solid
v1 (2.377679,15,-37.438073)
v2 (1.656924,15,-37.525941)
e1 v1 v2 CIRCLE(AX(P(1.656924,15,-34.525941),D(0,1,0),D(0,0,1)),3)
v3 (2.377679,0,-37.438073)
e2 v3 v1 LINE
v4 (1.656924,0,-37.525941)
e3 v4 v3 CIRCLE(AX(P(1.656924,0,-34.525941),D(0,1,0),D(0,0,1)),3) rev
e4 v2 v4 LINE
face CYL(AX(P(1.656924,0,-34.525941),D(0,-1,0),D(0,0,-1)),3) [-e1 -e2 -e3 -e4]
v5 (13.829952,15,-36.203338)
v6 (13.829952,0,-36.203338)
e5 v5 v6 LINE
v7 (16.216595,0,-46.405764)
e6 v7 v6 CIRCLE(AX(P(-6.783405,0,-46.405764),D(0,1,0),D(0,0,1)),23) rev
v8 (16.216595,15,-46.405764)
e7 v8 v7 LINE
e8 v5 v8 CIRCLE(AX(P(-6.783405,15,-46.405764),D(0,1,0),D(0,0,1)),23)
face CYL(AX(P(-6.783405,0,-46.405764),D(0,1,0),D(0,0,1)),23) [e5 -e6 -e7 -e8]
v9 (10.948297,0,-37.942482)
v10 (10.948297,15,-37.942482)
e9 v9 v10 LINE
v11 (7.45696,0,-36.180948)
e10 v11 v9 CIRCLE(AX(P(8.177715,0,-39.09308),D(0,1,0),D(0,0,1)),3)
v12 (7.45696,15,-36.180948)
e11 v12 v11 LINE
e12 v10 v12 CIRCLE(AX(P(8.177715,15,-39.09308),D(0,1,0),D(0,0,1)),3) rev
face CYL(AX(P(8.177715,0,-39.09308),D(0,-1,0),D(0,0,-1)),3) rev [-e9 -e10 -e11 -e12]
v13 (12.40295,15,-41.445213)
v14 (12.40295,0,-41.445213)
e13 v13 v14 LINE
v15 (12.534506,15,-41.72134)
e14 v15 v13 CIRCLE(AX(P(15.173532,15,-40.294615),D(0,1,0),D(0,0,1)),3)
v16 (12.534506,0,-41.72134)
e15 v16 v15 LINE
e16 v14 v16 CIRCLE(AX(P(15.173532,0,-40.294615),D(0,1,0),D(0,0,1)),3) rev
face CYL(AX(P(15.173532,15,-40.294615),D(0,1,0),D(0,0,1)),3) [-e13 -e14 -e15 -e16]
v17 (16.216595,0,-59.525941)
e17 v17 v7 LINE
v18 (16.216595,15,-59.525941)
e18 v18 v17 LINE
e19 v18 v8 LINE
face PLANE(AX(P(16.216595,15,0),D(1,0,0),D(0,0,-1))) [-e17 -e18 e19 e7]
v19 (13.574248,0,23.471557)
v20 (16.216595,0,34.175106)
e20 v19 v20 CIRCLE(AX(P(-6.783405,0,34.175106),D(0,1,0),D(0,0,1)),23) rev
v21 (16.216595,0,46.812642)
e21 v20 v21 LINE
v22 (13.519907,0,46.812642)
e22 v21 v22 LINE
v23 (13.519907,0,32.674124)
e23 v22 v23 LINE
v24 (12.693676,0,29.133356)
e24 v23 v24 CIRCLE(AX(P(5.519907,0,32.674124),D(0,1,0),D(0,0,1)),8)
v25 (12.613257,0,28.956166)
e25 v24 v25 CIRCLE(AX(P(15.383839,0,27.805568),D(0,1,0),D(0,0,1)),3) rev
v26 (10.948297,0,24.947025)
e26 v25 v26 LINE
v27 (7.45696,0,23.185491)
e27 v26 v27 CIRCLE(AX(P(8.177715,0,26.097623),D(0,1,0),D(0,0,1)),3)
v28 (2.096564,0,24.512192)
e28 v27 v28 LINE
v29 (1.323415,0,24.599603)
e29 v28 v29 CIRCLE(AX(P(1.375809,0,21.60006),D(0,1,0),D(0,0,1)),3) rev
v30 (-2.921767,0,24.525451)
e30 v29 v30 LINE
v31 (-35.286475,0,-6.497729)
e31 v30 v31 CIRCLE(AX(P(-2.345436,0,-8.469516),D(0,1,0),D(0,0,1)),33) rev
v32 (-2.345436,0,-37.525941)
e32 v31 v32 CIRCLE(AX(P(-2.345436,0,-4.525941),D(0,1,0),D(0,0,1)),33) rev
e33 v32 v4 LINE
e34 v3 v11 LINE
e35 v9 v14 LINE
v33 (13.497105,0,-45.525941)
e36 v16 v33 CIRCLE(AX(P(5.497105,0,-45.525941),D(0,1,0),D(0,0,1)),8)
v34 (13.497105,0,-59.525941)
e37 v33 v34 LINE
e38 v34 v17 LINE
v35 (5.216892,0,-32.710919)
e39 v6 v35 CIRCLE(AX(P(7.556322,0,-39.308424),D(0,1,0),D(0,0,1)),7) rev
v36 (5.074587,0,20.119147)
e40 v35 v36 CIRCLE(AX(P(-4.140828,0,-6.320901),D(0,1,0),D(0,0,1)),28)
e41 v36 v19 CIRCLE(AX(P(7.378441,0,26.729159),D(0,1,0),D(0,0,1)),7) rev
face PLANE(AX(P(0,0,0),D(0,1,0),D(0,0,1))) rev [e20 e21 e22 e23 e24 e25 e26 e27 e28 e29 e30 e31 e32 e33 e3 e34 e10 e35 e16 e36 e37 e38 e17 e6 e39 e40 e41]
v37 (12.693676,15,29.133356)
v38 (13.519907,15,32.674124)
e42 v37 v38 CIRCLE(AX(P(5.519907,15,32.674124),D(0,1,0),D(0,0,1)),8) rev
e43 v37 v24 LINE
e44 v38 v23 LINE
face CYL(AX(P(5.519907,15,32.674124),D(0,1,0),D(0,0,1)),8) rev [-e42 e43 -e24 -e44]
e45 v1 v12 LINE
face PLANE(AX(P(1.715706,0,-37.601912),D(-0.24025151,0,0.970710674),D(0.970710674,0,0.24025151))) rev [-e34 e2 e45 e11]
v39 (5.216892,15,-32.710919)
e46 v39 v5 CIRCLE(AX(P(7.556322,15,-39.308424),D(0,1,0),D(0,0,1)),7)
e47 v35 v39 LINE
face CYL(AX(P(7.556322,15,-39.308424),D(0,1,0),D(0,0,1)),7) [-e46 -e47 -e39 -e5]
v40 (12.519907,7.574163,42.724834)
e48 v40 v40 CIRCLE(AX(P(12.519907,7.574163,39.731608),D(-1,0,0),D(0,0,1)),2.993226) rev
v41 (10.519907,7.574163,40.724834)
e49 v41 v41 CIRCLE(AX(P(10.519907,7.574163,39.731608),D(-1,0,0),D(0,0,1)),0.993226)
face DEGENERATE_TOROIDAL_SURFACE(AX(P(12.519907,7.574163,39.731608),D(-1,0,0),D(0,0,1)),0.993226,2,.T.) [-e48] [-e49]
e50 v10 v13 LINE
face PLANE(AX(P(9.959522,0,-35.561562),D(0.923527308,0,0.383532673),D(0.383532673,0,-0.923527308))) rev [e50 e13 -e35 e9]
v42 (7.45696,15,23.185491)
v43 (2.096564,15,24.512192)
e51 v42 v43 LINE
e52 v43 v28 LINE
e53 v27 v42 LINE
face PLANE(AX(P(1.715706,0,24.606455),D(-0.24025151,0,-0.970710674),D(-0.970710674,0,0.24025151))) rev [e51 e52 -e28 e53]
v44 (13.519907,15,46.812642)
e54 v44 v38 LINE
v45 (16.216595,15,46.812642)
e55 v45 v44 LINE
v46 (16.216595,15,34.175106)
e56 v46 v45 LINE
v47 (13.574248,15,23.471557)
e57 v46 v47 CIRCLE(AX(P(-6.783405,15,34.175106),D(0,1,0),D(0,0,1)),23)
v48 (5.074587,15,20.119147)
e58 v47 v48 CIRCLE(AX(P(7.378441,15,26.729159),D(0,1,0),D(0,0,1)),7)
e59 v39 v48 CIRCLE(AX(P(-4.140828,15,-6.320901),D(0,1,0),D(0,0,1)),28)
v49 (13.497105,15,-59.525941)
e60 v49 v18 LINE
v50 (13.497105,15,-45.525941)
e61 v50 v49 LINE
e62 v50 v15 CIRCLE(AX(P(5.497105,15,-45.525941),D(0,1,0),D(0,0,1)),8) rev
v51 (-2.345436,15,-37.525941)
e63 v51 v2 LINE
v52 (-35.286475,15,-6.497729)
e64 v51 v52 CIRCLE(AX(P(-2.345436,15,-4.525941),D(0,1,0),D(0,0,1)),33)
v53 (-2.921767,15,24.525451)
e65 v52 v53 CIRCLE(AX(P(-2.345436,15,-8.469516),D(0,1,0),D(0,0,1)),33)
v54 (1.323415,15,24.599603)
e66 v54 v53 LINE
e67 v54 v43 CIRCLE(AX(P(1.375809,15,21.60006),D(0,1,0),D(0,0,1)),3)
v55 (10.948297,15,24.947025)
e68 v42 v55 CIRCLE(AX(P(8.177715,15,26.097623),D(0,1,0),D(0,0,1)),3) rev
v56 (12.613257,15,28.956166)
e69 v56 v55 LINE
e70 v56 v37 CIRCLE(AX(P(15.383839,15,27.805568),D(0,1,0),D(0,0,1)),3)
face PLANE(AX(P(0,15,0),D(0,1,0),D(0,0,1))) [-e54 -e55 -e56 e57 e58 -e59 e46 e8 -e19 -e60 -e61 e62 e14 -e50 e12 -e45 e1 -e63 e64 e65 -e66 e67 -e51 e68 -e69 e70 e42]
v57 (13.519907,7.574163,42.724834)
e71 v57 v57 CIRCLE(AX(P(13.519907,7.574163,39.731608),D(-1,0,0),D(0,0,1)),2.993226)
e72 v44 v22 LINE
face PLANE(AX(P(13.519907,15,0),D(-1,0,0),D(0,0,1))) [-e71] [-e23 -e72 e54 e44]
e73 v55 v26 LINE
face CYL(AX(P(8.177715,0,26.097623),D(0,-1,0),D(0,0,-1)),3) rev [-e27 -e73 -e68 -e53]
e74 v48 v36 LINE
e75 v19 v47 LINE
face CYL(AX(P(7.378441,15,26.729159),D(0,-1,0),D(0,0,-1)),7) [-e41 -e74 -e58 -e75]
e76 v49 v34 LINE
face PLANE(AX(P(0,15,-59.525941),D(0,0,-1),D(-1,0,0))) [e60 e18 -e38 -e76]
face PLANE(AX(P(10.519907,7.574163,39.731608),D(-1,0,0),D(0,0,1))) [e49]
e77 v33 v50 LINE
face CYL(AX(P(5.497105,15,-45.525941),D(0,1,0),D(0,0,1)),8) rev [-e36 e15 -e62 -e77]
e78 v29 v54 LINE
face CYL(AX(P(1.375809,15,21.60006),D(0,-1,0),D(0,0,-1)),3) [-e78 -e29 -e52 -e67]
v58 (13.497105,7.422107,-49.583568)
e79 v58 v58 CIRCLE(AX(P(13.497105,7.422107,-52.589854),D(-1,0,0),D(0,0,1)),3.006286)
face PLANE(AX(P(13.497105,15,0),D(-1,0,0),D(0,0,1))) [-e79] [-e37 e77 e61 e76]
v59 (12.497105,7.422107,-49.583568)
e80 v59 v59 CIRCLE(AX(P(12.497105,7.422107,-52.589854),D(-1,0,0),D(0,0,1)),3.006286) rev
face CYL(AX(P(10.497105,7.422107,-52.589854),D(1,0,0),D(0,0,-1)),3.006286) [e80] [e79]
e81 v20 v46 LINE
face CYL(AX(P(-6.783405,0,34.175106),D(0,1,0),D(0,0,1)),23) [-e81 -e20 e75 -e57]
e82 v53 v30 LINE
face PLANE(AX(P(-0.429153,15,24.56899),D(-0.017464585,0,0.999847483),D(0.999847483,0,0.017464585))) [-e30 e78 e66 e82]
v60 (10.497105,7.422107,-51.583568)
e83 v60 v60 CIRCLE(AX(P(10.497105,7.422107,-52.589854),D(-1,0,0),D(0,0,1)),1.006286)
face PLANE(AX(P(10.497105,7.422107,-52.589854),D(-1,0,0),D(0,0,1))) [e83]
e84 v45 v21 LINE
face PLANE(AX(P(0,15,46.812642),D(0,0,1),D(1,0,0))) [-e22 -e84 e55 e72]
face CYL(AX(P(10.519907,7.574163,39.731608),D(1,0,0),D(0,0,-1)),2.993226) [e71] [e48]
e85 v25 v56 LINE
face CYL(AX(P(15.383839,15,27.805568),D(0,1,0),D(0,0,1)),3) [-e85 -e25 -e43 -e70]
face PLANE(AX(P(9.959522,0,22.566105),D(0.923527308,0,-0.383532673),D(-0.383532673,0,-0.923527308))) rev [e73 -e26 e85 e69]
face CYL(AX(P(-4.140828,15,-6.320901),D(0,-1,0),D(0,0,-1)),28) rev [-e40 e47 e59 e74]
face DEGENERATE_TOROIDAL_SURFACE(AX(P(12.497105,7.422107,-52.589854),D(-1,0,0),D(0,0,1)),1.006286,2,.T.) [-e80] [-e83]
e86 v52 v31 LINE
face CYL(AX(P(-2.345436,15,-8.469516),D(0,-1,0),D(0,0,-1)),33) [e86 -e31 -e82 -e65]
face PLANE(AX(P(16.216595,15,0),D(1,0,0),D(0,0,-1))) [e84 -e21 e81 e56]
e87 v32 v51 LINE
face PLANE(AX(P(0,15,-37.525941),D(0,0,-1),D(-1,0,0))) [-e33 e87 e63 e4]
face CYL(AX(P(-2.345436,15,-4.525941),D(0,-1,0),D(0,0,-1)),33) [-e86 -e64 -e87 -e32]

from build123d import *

# Parameters (mm, degrees)
BOSS_EXTRUDE1_DEPTH = 15
FILLET1_R           = 33
FILLET3_R           = 8
SKETCH3_W           = 14.976754218
SKETCH3_H           = 50.502927364
CUT_EXTRUDE1_DEPTH  = 71.805882398
FILLET4_R           = 13
FILLET5_R           = 23
CUT_EXTRUDE2_DEPTH  = 71.805882398
FILLET6_R           = 3
FILLET7_R           = 7
SKETCH11_R          = 2.99322587
BOSS_EXTRUDE3_DEPTH = 3
SKETCH12_R          = 3.00628595
BOSS_EXTRUDE4_DEPTH = 3
FILLET15_R          = 2


with BuildPart() as part:
    # Sketch1 → Boss-Extrude1 (new body)
    with BuildSketch(Plane(origin=(0, 0, 0), x_dir=(1, 0, 0), z_dir=(0, 1, 0))):
        with BuildLine():
            Line((13.49710544, 37.52594122), (-35.345435735, 37.52594122))
            Line((-35.345435735, 37.52594122), (-35.345435735, -23.95909877))
            Line((-35.345435735, -23.95909877), (13.519906977, -24.812641875))
            Line((13.519906977, -24.812641875), (13.519906977, -46.812641875))
            Line((13.519906977, -46.812641875), (16.216594819, -46.812641875))
            Line((16.216594819, -46.812641875), (16.216594819, -12.903441484))
            ThreePointArc((16.216594819, -12.903441484), (-32.140827884, 6.320900922), (16.216594819, 25.545243327))
            Line((16.216594819, 25.545243327), (16.216594819, 59.52594122))
            Line((16.216594819, 59.52594122), (13.49710544, 59.52594122))
            Line((13.49710544, 59.52594122), (13.49710544, 37.52594122))
        make_face()
    extrude(amount=BOSS_EXTRUDE1_DEPTH)

    # Fillet1
    # the kernel refuses this fillet: 33 mm, written as the material it takes off along each edge
    with BuildSketch(Plane(origin=(-35.345435735, -81.071536578, 23.95909877), x_dir=(0, 0, -1), z_dir=(0, 1, 0))) as fillet1_piece_1:
        with BuildLine():
            CenterArc((FILLET1_R * 0.98268529185, -FILLET1_R), FILLET1_R, 90, 88.999302122)
            Line((-FILLET1_R * 0.0171621906577, -FILLET1_R * 0.982535415153), (0, 0))
            Line((0, 0), (FILLET1_R * 0.98268529185, 0))
        make_face()
    extrude(amount=177.143073155, mode=Mode.SUBTRACT)
    with BuildSketch(Plane(origin=(-35.345435735, -82.5, -37.52594122), x_dir=(1, 0, 0), z_dir=(0, 1, 0))) as fillet1_piece_2:
        with BuildLine():
            CenterArc((FILLET1_R, -FILLET1_R), FILLET1_R, 90, 90)
            Line((0, -FILLET1_R), (0, 0))
            Line((0, 0), (FILLET1_R, 0))
        make_face()
    extrude(amount=180, mode=Mode.SUBTRACT)

    # Fillet3
    fillet3_edges = [part.edges().sort_by_distance(p)[0] for p in [
        (13.519906977, 7.5, 24.812641875),
        (13.49710544, 7.5, -37.52594122),
    ]]
    fillet(fillet3_edges, radius=FILLET3_R)

    # Sketch3 → Cut-Extrude1 (cut, through all)
    with BuildSketch(Plane(origin=(0, 15, 0), x_dir=(1, 0, 0), z_dir=(0, 1, 0))):
        with Locations((13.189850954, 6.26949409)):
            Rectangle(SKETCH3_W, SKETCH3_H)
    extrude(amount=-CUT_EXTRUDE1_DEPTH, mode=Mode.SUBTRACT)

    # Fillet4
    fillet4_edges = [part.edges().sort_by_distance(p)[0] for p in [
        (8.063971776, 7.5, -31.520957772),
        (7.849365767, 7.5, 18.981969592),
    ]]
    fillet(fillet4_edges, radius=FILLET4_R)

    # Fillet5
    # the kernel refuses this fillet: 23 mm, written as the material it takes off along each edge
    with BuildSketch(Plane(origin=(16.216594819, -37.21201477, -31.520957772), x_dir=(-1, 0, 0), z_dir=(0, 1, 0))) as fillet5_piece_1:
        with BuildLine():
            CenterArc((23, -14.884805908), FILLET5_R, 139.671769874, 40.328230126)
            Line((0, -14.884805908), (-0.46, -14.884805908))
            Line((-0.46, -14.884805908), (-0.46, 0))
            Line((-0.46, 0), (0, 0.46))
            ThreePointArc((0, 0.46), (2.73298008, 0.46), (5.115279364, 0.297696118))
            Line((5.115279364, 0.297696118), (5.465960161, 0))
        make_face()
    extrude(amount=89.424029541, mode=Mode.SUBTRACT)
    with BuildSketch(Plane(origin=(16.216594819, 52.982840025, 18.981969592), x_dir=(-1, 0, 0), z_dir=(0, -1, 0))) as fillet5_piece_2:
        with BuildLine():
            CenterArc((23, -15.19313601), FILLET5_R, 138.656554967, 41.343445033)
            Line((0, -15.19313601), (-0.46, -15.19313601))
            Line((-0.46, -15.19313601), (-0.46, 0))
            Line((-0.46, 0), (0, 0.46))
            ThreePointArc((0, 0.46), (2.866220147, 0.46), (5.3870891, 0.30386272))
            Line((5.3870891, 0.30386272), (5.732440294, 0))
        make_face()
    extrude(amount=90.96568005, mode=Mode.SUBTRACT)

    # Sketch4 → Cut-Extrude2 (cut, through all)
    with BuildSketch(Plane(origin=(0, 15, 0), x_dir=(1, 0, 0), z_dir=(0, 1, 0))):
        Polygon((1.715705502, -24.606454949), (9.959521951, -22.566105124), (13.119950571, -30.176257645), align=None)
        Polygon((13.119950571, 43.171714726), (1.715705502, 37.60191203), (9.959521951, 35.561562205), align=None)
    extrude(amount=-CUT_EXTRUDE2_DEPTH, mode=Mode.SUBTRACT)

    # Fillet6
    # the kernel refuses this fillet: 3 mm, written as the material it adds along each edge
    with BuildSketch(Plane(origin=(9.959521951, 15, 22.566105124), x_dir=(0.38353267260391577, 0, 0.9235273082293222), z_dir=(0, -1, 0)), Plane(origin=(9.959521951, 15, -35.561562205), x_dir=(-0.9707106735613967, 0, -0.24025151036773845), z_dir=(0, -1, 0))) as fillet6_piece_1:
        with BuildLine():
            CenterArc((FILLET6_R * 0.859357235827, FILLET6_R), FILLET6_R, 188.651291771, 81.348708229)
            Line((-FILLET6_R * 0.129264883466, FILLET6_R * 0.849579571712), (0, 0))
            Line((0, 0), (FILLET6_R * 0.859357235827, 0))
        make_face()
    extrude(amount=15)
    # the kernel refuses this fillet: 3 mm, written as the material it takes off along each edge
    with BuildSketch(Plane(origin=(12.653561764, -0.262717319, 29.053216951), x_dir=(-0.3835326726039229, 0, -0.9235273082293193), z_dir=(0, 1, 0))) as fillet6_2_piece_1:
        with BuildLine():
            CenterArc((0.105086928, -3), FILLET6_R, 90, 3.716956431)
            ThreePointArc((-0.089395975, -0.00631057), (-0.044689151, -0.003280466), (0, 0))
            Line((0, 0), (0.105086928, 0))
        make_face()
    extrude(amount=15.525434639, mode=Mode.SUBTRACT)
    with BuildSketch(Plane(origin=(12.466360821, -0.41333627, -41.597903613), x_dir=(0.4833086879383824, 0, -0.8754500055190354), z_dir=(0, 1, 0))) as fillet6_2_piece_2:
        with BuildLine():
            CenterArc((0.167434819, -2.999883511), FILLET6_R, 90.504917507, 5.844127099)
            Line((-0.164320455, -0.018283532), (0, 0))
            ThreePointArc((0, 0), (0.070498871, -0.000310637), (0.140997742, 0))
        make_face()
    extrude(amount=15.826672539, mode=Mode.SUBTRACT)
    with BuildSketch(Plane(origin=(1.715705502, 15.980874738, 24.606454949), x_dir=(-0.9998474825072629, 0, -0.017464584847299507), z_dir=(0, -1, 0))) as fillet6_2_piece_3:
        with BuildLine():
            CenterArc((FILLET6_R * 0.130783298337, FILLET6_R), FILLET6_R, 255.097916944, 14.902083056)
            Line((-FILLET6_R * 0.126384628394, FILLET6_R * 0.0336332696842), (0, 0))
            Line((0, 0), (FILLET6_R * 0.130783298337, 0))
        make_face()
    extrude(amount=16.961749475, mode=Mode.SUBTRACT)
    with BuildSketch(Plane(origin=(2.022657479, 15.914333267, -37.52594122), x_dir=(0.9707106735613966, 0, 0.24025151036773865), z_dir=(0, -1, 0))) as fillet6_2_piece_4:
        with BuildLine():
            CenterArc((FILLET6_R * 0.121911102219, FILLET6_R), FILLET6_R, 256.098614822, 13.901385178)
            Line((-FILLET6_R * 0.118340408149, FILLET6_R * 0.0292893264386), (0, 0))
            Line((0, 0), (FILLET6_R * 0.121911102219, 0))
        make_face()
    extrude(amount=16.828666533, mode=Mode.SUBTRACT)

    # Fillet7
    fillet7_edges = [part.edges().sort_by_distance(p)[0] for p in [
        (10.484154524, 7.5, 18.981969592),
        (10.750634658, 7.5, -31.520957772),
    ]]
    fillet(fillet7_edges, radius=FILLET7_R)

    # Sketch11 → Boss-Extrude3 (add)
    with BuildSketch(Plane.ZY.offset(-13.519906977)):
        with Locations((39.731607941, 7.574163162)):
            Circle(SKETCH11_R)
    extrude(amount=BOSS_EXTRUDE3_DEPTH)

    # Sketch12 → Boss-Extrude4 (add)
    with BuildSketch(Plane.ZY.offset(-13.49710544)):
        with Locations((-52.589854429, 7.422107304)):
            Circle(SKETCH12_R)
    extrude(amount=BOSS_EXTRUDE4_DEPTH)

    # Fillet15
    fillet15_edges = [part.edges().sort_by_distance(p)[0] for p in [
        (10.519906977, 7.574163162, 36.738382071),
        (10.49710544, 7.422107304, -55.59614038),
    ]]
    fillet(fillet15_edges, radius=FILLET15_R)


solid = part.part
